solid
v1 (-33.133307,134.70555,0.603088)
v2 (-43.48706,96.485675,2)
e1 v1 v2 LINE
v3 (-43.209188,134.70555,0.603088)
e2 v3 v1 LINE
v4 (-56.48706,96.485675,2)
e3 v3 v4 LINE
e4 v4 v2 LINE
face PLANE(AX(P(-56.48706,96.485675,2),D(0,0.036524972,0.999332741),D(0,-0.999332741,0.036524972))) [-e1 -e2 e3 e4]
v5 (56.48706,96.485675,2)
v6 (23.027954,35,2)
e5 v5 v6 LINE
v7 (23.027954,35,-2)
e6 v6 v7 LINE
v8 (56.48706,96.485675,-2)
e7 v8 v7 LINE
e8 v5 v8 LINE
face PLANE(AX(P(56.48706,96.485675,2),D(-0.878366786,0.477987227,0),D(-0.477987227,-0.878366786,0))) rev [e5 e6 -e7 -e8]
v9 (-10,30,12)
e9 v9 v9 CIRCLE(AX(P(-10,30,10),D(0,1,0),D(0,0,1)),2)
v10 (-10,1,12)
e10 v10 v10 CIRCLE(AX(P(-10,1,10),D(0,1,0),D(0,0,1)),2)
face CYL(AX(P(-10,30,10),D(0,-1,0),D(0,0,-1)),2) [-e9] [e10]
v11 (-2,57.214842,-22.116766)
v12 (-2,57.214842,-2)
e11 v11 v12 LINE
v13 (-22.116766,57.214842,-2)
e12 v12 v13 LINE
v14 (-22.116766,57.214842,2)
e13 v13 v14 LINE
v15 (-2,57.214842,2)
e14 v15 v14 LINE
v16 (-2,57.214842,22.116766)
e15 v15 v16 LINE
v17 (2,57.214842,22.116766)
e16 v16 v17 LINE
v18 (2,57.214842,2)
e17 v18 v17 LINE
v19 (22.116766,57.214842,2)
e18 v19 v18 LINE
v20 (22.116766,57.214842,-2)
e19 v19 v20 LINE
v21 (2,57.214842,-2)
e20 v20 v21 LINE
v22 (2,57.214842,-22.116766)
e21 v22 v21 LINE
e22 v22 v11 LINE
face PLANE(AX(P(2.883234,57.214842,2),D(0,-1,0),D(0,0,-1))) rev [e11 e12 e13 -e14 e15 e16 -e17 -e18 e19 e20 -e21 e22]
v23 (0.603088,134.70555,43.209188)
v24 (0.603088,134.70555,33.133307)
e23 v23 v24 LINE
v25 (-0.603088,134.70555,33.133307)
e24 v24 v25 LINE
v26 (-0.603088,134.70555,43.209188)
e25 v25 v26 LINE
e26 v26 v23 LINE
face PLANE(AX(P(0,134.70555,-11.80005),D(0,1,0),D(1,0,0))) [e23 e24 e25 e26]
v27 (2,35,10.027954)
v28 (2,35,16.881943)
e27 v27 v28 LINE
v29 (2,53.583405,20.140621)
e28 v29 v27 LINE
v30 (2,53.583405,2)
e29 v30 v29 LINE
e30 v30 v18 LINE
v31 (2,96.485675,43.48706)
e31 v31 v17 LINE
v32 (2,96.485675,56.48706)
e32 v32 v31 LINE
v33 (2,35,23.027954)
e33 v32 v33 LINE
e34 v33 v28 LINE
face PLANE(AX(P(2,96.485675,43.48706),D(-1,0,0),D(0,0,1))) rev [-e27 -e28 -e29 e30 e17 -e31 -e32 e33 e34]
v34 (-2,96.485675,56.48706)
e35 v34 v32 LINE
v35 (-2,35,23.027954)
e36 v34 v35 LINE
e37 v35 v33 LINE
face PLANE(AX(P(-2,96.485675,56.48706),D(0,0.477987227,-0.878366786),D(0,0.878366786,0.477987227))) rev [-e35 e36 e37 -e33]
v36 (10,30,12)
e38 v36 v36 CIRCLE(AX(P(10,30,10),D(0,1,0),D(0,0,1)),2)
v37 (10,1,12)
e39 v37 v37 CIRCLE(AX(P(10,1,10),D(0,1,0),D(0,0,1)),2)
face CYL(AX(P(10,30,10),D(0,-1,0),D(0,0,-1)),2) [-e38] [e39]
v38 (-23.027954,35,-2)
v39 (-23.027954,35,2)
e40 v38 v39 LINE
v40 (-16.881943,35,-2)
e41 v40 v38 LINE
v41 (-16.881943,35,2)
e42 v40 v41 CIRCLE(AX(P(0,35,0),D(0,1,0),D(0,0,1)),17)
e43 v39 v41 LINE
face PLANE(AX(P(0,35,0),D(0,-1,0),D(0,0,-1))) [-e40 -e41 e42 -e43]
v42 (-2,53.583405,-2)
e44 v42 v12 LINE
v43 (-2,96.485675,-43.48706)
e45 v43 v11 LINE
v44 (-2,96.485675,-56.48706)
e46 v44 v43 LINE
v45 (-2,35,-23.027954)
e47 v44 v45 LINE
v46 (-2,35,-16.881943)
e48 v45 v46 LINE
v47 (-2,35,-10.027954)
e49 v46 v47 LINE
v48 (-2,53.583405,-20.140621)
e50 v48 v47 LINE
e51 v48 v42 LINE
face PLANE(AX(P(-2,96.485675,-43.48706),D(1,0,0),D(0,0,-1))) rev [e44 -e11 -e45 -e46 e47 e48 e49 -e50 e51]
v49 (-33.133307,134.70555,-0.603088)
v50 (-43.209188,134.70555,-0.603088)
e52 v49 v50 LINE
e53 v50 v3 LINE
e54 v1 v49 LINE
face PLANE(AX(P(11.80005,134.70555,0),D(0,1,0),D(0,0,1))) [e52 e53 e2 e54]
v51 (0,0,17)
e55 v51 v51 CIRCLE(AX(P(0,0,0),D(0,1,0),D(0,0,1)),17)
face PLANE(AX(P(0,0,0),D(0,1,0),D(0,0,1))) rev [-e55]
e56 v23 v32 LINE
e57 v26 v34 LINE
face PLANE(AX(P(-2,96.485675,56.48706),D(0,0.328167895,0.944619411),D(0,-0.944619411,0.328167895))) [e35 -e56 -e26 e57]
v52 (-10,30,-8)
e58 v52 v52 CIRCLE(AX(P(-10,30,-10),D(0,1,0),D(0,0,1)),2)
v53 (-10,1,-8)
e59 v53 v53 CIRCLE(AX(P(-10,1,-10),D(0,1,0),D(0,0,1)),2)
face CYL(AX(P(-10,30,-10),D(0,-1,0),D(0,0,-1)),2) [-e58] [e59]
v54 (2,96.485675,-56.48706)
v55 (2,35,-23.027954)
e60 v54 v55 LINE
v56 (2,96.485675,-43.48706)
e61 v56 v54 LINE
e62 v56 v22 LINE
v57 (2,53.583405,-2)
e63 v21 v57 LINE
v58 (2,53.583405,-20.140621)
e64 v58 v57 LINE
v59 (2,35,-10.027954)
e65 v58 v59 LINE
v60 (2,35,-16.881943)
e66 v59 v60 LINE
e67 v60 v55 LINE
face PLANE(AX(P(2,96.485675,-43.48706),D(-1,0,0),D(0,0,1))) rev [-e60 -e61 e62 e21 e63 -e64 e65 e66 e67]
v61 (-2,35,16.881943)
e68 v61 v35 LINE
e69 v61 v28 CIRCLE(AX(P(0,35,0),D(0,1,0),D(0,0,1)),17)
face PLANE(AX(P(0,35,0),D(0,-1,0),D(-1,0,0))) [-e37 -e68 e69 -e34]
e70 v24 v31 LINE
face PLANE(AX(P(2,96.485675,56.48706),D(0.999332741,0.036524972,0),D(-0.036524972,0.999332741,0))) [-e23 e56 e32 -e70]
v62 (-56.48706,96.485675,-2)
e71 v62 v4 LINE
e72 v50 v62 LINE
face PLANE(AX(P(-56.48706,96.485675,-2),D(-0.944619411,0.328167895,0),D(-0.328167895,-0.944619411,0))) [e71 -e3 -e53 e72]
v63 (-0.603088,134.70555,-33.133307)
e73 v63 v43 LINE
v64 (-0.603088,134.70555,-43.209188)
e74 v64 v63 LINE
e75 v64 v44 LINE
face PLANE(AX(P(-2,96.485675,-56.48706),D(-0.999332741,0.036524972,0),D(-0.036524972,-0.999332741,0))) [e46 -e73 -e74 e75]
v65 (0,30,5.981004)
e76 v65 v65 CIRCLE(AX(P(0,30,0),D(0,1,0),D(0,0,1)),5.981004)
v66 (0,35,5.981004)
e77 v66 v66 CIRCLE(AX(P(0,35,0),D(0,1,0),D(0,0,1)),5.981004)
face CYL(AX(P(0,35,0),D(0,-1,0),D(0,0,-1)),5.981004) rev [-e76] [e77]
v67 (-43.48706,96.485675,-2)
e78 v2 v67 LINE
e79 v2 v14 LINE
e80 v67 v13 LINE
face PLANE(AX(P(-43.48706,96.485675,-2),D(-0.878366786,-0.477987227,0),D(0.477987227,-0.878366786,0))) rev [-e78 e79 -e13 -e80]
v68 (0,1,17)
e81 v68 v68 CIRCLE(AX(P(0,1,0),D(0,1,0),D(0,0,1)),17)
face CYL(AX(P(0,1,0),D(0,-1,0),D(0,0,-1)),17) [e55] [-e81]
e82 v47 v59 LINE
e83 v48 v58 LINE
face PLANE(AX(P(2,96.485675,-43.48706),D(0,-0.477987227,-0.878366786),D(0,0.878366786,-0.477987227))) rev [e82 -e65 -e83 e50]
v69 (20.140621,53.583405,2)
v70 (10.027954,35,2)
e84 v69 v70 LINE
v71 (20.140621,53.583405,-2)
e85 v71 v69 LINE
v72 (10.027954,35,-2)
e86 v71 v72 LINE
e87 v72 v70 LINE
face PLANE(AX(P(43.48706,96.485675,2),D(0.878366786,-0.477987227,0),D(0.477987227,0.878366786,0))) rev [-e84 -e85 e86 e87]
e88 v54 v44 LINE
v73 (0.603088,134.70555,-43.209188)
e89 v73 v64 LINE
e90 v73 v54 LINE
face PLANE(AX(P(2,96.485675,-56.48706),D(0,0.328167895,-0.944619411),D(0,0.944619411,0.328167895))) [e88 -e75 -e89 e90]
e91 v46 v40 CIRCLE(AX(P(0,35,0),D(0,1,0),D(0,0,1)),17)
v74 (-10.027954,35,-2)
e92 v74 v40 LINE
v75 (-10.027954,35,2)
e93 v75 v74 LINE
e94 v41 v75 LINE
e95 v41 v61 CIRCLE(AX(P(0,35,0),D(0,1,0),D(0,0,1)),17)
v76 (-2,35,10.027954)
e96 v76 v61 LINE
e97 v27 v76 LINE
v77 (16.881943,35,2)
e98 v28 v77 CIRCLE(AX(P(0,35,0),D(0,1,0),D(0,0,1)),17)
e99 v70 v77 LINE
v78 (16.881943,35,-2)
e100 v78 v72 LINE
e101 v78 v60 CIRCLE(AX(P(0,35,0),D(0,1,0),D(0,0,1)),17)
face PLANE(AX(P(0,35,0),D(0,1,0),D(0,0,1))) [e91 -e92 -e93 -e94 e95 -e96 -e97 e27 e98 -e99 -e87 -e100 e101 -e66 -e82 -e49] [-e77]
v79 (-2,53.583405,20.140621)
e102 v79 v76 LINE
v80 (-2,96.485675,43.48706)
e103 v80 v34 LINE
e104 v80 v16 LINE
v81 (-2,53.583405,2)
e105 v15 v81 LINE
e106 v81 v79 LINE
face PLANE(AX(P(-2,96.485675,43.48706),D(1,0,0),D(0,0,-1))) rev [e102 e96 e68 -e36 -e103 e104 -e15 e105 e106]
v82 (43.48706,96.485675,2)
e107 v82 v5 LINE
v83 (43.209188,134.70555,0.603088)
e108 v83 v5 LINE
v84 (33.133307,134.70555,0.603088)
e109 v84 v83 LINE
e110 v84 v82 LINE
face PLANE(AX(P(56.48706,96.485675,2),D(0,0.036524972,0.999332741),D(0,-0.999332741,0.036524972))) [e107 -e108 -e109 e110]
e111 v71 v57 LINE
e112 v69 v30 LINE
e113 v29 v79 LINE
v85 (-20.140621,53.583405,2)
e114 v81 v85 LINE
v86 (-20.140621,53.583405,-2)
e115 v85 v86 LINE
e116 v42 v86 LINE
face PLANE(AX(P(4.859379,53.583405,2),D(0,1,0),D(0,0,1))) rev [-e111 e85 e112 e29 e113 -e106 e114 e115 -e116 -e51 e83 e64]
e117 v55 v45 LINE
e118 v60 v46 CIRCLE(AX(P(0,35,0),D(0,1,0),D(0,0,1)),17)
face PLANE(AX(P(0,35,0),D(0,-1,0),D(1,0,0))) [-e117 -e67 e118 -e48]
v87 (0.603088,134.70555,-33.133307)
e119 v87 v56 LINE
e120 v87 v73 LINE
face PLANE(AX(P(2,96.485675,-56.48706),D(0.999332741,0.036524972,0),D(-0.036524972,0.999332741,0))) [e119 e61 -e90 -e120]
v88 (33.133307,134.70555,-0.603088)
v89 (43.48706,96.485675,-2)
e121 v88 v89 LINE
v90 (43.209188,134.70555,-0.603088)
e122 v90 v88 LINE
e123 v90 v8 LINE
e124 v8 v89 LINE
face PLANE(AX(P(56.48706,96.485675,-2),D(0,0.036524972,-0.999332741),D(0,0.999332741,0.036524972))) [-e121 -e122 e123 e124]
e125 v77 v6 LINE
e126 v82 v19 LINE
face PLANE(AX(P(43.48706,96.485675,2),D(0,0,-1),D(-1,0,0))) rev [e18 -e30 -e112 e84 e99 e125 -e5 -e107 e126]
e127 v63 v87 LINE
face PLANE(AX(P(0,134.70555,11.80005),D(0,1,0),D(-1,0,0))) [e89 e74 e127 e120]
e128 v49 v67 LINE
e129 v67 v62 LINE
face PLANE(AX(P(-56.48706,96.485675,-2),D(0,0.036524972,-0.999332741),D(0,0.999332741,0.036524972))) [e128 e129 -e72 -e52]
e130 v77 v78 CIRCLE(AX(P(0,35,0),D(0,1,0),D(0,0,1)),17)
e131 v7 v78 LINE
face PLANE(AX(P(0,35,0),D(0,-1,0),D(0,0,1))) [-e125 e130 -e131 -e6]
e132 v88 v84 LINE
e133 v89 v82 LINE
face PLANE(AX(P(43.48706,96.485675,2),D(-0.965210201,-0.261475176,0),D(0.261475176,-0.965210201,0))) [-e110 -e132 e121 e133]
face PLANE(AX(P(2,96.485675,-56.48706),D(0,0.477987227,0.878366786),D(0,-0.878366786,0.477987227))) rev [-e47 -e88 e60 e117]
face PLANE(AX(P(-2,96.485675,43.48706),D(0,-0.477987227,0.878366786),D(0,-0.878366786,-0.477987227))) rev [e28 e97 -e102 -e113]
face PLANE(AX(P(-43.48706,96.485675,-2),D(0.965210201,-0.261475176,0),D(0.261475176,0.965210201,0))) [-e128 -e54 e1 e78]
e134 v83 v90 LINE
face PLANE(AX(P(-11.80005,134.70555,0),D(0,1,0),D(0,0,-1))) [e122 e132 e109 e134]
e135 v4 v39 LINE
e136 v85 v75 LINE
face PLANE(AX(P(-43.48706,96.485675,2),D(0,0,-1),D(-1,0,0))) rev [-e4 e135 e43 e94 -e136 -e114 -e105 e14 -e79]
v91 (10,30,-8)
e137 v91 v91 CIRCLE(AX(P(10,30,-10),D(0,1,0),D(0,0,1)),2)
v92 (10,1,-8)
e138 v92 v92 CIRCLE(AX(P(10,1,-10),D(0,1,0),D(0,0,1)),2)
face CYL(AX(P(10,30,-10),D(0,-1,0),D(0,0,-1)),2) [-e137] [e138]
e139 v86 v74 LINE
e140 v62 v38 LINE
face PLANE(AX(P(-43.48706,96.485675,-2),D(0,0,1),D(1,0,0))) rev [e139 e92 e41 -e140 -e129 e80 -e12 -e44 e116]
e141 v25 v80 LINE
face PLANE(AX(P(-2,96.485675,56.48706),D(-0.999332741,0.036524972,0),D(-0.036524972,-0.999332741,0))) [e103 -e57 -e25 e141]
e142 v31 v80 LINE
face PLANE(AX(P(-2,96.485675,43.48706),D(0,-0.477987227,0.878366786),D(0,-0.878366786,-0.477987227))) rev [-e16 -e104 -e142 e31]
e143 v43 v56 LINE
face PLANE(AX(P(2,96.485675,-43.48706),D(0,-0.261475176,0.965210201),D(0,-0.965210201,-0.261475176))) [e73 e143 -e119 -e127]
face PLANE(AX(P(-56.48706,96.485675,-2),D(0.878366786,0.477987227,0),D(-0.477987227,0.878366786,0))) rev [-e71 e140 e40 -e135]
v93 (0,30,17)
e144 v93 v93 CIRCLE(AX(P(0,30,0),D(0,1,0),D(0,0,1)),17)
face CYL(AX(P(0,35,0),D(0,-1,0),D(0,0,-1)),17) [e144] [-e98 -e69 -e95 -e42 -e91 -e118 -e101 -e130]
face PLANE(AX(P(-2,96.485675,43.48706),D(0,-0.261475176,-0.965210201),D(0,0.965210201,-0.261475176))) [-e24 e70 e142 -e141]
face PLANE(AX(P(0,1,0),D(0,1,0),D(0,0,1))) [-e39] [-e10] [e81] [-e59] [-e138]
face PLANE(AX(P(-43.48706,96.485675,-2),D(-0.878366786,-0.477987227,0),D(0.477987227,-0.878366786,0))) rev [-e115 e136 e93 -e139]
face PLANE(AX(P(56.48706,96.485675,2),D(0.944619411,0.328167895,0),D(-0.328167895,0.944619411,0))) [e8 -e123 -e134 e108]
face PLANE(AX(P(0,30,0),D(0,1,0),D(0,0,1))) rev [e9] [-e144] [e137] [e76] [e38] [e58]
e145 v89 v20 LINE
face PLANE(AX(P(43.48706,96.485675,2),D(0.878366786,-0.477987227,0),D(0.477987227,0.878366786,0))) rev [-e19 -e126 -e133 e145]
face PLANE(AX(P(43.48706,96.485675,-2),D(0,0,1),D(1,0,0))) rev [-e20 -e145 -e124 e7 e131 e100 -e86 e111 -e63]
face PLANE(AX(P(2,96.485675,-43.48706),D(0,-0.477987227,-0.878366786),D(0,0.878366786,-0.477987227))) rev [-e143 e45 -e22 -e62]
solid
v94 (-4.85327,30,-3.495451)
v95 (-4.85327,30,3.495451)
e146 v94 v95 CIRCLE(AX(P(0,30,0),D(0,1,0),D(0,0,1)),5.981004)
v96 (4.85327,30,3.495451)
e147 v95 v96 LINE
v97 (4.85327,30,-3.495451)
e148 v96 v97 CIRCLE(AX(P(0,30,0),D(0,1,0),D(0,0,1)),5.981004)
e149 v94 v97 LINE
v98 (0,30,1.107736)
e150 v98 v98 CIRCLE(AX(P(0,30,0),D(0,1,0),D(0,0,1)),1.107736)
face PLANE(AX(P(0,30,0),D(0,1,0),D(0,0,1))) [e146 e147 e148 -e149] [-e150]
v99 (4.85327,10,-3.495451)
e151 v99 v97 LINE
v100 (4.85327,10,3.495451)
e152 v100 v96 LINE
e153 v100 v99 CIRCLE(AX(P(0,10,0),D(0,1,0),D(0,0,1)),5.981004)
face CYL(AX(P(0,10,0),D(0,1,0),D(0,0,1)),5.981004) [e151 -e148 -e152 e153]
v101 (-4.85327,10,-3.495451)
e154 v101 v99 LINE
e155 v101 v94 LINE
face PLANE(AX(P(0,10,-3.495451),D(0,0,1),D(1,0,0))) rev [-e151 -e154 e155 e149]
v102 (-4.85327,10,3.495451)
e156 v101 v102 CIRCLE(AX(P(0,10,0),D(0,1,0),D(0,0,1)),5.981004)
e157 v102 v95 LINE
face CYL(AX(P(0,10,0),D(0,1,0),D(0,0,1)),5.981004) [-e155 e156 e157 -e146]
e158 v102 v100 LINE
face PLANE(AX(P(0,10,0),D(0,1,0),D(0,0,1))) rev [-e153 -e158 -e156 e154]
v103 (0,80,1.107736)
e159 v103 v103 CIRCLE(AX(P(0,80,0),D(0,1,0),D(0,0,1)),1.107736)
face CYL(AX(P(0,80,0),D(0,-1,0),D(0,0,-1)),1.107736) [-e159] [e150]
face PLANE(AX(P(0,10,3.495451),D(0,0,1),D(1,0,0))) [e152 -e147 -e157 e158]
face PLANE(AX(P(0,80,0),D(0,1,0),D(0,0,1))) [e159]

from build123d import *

# Parameters (mm, degrees)
SKETCH1_R            = 17
SKETCH1_R_2          = 2
BOSS_EXTRUDE1_DEPTH  = 1
SKETCH1_3_R          = 2
BOSS_EXTRUDE2_DEPTH  = 30
SKETCH2_R            = 17
SKETCH2_R_2          = 5.981003934
SKETCH2_R_3          = 2
BOSS_EXTRUDE3_DEPTH  = 5
BOSS_EXTRUDE4_DEPTH  = 20
SKETCH3_R            = 1.107736243
BOSS_EXTRUDE5_DEPTH  = 50
SKETCH4_W            = 13
SKETCH4_H            = 4
BOSS_EXTRUDE7_DEPTH  = 70
CIRPATTERN1_COUNT    = 4
CIRPATTERN2_COUNT    = 4
SKETCH9_W            = 4
SKETCH9_H            = 4.134305267
BOSS_EXTRUDE12_DEPTH = 25
CIRPATTERN8_COUNT    = 4


with BuildPart() as part:
    # Sketch1 → Boss-Extrude1 (new body)
    with BuildSketch(Plane(origin=(0, 0, 0), x_dir=(1, 0, 0), z_dir=(0, 1, 0))):
        with Locations(Location((0, 0, 0), (0, 0, 270))):
            Circle(SKETCH1_R)
        with Locations(Location((-10, 10, 0), (0, 0, 270))):
            Circle(SKETCH1_R_2, mode=Mode.SUBTRACT)
        with Locations(Location((10, 10, 0), (0, 0, 270))):
            Circle(SKETCH1_R_2, mode=Mode.SUBTRACT)
        with Locations(Location((10, -10, 0), (0, 0, 270))):
            Circle(SKETCH1_R_2, mode=Mode.SUBTRACT)
        with Locations(Location((-10, -10, 0), (0, 0, 270))):
            Circle(SKETCH1_R_2, mode=Mode.SUBTRACT)
    extrude(amount=BOSS_EXTRUDE1_DEPTH)

    # Sketch1<3> → Boss-Extrude2 (add)
    with BuildSketch(Plane(origin=(0, 0, 0), x_dir=(1, 0, 0), z_dir=(0, 1, 0))):
        with Locations(Location((-10, 10, 0), (0, 0, 270))):
            Circle(SKETCH1_3_R)
        with Locations(Location((10, 10, 0), (0, 0, 270))):
            Circle(SKETCH1_3_R)
        with Locations(Location((10, -10, 0), (0, 0, 270))):
            Circle(SKETCH1_3_R)
        with Locations(Location((-10, -10, 0), (0, 0, 270))):
            Circle(SKETCH1_3_R)
    extrude(amount=BOSS_EXTRUDE2_DEPTH)

    # Sketch2 → Boss-Extrude3 (add)
    # profile 1 of 2: a face of its own
    with BuildSketch(Plane(origin=(0, 30, 0), x_dir=(1, 0, 0), z_dir=(0, 1, 0))):
        with Locations(Location((0, 0, 0), (0, 0, 270))):
            Circle(SKETCH2_R)
        with Locations(Location((0, 0, 0), (0, 0, 270))):
            Circle(SKETCH2_R_2, mode=Mode.SUBTRACT)
        with Locations(Location((-10, 10, 0), (0, 0, 270))):
            Circle(SKETCH2_R_3, mode=Mode.SUBTRACT)
    # profile 2 of 2: a face of its own
    with BuildSketch(Plane(origin=(0, 30, 0), x_dir=(1, 0, 0), z_dir=(0, 1, 0))):
        with Locations(Location((-10, 10, 0), (0, 0, 270))):
            Circle(SKETCH2_R_3)
    extrude(amount=BOSS_EXTRUDE3_DEPTH)

    # Sketch4 → Boss-Extrude7 (add, along a direction that is not the sketch's normal)
    with BuildSketch(Plane(origin=(0, 35, 0), x_dir=(1, 0, 0), z_dir=(0, 1, 0))):
        with Locations((-16.527954488, 0)):
            Rectangle(SKETCH4_W, SKETCH4_H)
    boss_extrude7 = extrude(amount=BOSS_EXTRUDE7_DEPTH, dir=(-0.47798722714939545, 0.8783667859624659, 0))

    # Boss-Extrude8: read off the stored shape, not the designer's step
    # Boss-Extrude8: loft between two sections, ruled curve by curve
    boss_extrude8_from = [
        Edge.make_line((-56.487060388, 96.485675017, -2), (-56.487060388, 96.485675017, 2)),
        Edge.make_line((-56.487060388, 96.485675017, 2), (-43.487060388, 96.485675017, 2)),
        Edge.make_line((-43.487060388, 96.485675017, 2), (-43.487060388, 96.485675017, -2)),
        Edge.make_line((-43.487060388, 96.485675017, -2), (-56.487060388, 96.485675017, -2)),
    ]
    boss_extrude8_to = [
        Edge.make_line((-43.209188151, 134.705549787, -0.603088029), (-43.209188151, 134.705549787, 0.603088029)),
        Edge.make_line((-43.209188151, 134.705549787, 0.603088029), (-33.133306924, 134.705549787, 0.603088029)),
        Edge.make_line((-33.133306924, 134.705549787, 0.603088029), (-33.133306924, 134.705549787, -0.603088029)),
        Edge.make_line((-33.133306924, 134.705549787, -0.603088029), (-43.209188151, 134.705549787, -0.603088029)),
    ]
    boss_extrude8 = Solid(Shell([*[Face.make_surface_from_curves(boss_extrude8_from[k], boss_extrude8_to[k]) for k in range(4)], Face(Wire(boss_extrude8_from)), Face(Wire(boss_extrude8_to))]))
    add(boss_extrude8)

    # CirPattern1: Boss-Extrude7 ×4 about axis
    cirpattern1_axis = Axis((0, 0, 0), (0, 1, 0))
    for i in range(1, CIRPATTERN1_COUNT):
        add(boss_extrude7.rotate(cirpattern1_axis, i * 360 / CIRPATTERN1_COUNT))

    # CirPattern2: Boss-Extrude8 ×4 about axis
    cirpattern2_axis = Axis((0, 0, 0), (0, 1, 0))
    for i in range(1, CIRPATTERN2_COUNT):
        add(boss_extrude8.rotate(cirpattern2_axis, i * 360 / CIRPATTERN2_COUNT))

    # Sketch9 → Boss-Extrude12 (add, along a direction that is not the sketch's normal)
    with BuildSketch(Plane(origin=(6.957833873, 3.786294943, 0), x_dir=(0, 0, -1), z_dir=(0.8783667859624659, 0.47798722714939545, 0))):
        with Locations((0, 58.75999588)):
            Rectangle(SKETCH9_W, SKETCH9_H)
    boss_extrude12 = extrude(amount=BOSS_EXTRUDE12_DEPTH, dir=(1, 0, 0))

    # CirPattern8: Boss-Extrude12 ×4 about axis
    cirpattern8_axis = Axis((0, 80, 0), (0, 1, 0))
    for i in range(1, CIRPATTERN8_COUNT):
        add(boss_extrude12.rotate(cirpattern8_axis, i * 360 / CIRPATTERN8_COUNT))


with BuildPart() as body_2:
    # Sketch2<3> → Boss-Extrude4 (new body)
    with BuildSketch(Plane(origin=(0, 30, 0), x_dir=(1, 0, 0), z_dir=(0, 1, 0))):
        with BuildLine():
            Line((4.853270007, 3.495451086), (-4.853270007, 3.495451086))
            ThreePointArc((-4.853270007, 3.495451086), (-5.981003934, 0), (-4.853270007, -3.495451086))
            Line((-4.853270007, -3.495451086), (4.853270007, -3.495451086))
            ThreePointArc((4.853270007, -3.495451086), (5.692092544, -1.836434188), (5.981003934, 0))
            ThreePointArc((5.981003934, 0), (5.692092544, 1.836434188), (4.853270007, 3.495451086))
        make_face()
    extrude(amount=-BOSS_EXTRUDE4_DEPTH)

    # Sketch3 → Boss-Extrude5 (add)
    with BuildSketch(Plane(origin=(0, 30, 0), x_dir=(1, 0, 0), z_dir=(0, 1, 0))):
        with Locations(Location((0, 0, 0), (0, 0, 270))):
            Circle(SKETCH3_R)
    extrude(amount=BOSS_EXTRUDE5_DEPTH)


solid = Compound([part.part, body_2.part])
